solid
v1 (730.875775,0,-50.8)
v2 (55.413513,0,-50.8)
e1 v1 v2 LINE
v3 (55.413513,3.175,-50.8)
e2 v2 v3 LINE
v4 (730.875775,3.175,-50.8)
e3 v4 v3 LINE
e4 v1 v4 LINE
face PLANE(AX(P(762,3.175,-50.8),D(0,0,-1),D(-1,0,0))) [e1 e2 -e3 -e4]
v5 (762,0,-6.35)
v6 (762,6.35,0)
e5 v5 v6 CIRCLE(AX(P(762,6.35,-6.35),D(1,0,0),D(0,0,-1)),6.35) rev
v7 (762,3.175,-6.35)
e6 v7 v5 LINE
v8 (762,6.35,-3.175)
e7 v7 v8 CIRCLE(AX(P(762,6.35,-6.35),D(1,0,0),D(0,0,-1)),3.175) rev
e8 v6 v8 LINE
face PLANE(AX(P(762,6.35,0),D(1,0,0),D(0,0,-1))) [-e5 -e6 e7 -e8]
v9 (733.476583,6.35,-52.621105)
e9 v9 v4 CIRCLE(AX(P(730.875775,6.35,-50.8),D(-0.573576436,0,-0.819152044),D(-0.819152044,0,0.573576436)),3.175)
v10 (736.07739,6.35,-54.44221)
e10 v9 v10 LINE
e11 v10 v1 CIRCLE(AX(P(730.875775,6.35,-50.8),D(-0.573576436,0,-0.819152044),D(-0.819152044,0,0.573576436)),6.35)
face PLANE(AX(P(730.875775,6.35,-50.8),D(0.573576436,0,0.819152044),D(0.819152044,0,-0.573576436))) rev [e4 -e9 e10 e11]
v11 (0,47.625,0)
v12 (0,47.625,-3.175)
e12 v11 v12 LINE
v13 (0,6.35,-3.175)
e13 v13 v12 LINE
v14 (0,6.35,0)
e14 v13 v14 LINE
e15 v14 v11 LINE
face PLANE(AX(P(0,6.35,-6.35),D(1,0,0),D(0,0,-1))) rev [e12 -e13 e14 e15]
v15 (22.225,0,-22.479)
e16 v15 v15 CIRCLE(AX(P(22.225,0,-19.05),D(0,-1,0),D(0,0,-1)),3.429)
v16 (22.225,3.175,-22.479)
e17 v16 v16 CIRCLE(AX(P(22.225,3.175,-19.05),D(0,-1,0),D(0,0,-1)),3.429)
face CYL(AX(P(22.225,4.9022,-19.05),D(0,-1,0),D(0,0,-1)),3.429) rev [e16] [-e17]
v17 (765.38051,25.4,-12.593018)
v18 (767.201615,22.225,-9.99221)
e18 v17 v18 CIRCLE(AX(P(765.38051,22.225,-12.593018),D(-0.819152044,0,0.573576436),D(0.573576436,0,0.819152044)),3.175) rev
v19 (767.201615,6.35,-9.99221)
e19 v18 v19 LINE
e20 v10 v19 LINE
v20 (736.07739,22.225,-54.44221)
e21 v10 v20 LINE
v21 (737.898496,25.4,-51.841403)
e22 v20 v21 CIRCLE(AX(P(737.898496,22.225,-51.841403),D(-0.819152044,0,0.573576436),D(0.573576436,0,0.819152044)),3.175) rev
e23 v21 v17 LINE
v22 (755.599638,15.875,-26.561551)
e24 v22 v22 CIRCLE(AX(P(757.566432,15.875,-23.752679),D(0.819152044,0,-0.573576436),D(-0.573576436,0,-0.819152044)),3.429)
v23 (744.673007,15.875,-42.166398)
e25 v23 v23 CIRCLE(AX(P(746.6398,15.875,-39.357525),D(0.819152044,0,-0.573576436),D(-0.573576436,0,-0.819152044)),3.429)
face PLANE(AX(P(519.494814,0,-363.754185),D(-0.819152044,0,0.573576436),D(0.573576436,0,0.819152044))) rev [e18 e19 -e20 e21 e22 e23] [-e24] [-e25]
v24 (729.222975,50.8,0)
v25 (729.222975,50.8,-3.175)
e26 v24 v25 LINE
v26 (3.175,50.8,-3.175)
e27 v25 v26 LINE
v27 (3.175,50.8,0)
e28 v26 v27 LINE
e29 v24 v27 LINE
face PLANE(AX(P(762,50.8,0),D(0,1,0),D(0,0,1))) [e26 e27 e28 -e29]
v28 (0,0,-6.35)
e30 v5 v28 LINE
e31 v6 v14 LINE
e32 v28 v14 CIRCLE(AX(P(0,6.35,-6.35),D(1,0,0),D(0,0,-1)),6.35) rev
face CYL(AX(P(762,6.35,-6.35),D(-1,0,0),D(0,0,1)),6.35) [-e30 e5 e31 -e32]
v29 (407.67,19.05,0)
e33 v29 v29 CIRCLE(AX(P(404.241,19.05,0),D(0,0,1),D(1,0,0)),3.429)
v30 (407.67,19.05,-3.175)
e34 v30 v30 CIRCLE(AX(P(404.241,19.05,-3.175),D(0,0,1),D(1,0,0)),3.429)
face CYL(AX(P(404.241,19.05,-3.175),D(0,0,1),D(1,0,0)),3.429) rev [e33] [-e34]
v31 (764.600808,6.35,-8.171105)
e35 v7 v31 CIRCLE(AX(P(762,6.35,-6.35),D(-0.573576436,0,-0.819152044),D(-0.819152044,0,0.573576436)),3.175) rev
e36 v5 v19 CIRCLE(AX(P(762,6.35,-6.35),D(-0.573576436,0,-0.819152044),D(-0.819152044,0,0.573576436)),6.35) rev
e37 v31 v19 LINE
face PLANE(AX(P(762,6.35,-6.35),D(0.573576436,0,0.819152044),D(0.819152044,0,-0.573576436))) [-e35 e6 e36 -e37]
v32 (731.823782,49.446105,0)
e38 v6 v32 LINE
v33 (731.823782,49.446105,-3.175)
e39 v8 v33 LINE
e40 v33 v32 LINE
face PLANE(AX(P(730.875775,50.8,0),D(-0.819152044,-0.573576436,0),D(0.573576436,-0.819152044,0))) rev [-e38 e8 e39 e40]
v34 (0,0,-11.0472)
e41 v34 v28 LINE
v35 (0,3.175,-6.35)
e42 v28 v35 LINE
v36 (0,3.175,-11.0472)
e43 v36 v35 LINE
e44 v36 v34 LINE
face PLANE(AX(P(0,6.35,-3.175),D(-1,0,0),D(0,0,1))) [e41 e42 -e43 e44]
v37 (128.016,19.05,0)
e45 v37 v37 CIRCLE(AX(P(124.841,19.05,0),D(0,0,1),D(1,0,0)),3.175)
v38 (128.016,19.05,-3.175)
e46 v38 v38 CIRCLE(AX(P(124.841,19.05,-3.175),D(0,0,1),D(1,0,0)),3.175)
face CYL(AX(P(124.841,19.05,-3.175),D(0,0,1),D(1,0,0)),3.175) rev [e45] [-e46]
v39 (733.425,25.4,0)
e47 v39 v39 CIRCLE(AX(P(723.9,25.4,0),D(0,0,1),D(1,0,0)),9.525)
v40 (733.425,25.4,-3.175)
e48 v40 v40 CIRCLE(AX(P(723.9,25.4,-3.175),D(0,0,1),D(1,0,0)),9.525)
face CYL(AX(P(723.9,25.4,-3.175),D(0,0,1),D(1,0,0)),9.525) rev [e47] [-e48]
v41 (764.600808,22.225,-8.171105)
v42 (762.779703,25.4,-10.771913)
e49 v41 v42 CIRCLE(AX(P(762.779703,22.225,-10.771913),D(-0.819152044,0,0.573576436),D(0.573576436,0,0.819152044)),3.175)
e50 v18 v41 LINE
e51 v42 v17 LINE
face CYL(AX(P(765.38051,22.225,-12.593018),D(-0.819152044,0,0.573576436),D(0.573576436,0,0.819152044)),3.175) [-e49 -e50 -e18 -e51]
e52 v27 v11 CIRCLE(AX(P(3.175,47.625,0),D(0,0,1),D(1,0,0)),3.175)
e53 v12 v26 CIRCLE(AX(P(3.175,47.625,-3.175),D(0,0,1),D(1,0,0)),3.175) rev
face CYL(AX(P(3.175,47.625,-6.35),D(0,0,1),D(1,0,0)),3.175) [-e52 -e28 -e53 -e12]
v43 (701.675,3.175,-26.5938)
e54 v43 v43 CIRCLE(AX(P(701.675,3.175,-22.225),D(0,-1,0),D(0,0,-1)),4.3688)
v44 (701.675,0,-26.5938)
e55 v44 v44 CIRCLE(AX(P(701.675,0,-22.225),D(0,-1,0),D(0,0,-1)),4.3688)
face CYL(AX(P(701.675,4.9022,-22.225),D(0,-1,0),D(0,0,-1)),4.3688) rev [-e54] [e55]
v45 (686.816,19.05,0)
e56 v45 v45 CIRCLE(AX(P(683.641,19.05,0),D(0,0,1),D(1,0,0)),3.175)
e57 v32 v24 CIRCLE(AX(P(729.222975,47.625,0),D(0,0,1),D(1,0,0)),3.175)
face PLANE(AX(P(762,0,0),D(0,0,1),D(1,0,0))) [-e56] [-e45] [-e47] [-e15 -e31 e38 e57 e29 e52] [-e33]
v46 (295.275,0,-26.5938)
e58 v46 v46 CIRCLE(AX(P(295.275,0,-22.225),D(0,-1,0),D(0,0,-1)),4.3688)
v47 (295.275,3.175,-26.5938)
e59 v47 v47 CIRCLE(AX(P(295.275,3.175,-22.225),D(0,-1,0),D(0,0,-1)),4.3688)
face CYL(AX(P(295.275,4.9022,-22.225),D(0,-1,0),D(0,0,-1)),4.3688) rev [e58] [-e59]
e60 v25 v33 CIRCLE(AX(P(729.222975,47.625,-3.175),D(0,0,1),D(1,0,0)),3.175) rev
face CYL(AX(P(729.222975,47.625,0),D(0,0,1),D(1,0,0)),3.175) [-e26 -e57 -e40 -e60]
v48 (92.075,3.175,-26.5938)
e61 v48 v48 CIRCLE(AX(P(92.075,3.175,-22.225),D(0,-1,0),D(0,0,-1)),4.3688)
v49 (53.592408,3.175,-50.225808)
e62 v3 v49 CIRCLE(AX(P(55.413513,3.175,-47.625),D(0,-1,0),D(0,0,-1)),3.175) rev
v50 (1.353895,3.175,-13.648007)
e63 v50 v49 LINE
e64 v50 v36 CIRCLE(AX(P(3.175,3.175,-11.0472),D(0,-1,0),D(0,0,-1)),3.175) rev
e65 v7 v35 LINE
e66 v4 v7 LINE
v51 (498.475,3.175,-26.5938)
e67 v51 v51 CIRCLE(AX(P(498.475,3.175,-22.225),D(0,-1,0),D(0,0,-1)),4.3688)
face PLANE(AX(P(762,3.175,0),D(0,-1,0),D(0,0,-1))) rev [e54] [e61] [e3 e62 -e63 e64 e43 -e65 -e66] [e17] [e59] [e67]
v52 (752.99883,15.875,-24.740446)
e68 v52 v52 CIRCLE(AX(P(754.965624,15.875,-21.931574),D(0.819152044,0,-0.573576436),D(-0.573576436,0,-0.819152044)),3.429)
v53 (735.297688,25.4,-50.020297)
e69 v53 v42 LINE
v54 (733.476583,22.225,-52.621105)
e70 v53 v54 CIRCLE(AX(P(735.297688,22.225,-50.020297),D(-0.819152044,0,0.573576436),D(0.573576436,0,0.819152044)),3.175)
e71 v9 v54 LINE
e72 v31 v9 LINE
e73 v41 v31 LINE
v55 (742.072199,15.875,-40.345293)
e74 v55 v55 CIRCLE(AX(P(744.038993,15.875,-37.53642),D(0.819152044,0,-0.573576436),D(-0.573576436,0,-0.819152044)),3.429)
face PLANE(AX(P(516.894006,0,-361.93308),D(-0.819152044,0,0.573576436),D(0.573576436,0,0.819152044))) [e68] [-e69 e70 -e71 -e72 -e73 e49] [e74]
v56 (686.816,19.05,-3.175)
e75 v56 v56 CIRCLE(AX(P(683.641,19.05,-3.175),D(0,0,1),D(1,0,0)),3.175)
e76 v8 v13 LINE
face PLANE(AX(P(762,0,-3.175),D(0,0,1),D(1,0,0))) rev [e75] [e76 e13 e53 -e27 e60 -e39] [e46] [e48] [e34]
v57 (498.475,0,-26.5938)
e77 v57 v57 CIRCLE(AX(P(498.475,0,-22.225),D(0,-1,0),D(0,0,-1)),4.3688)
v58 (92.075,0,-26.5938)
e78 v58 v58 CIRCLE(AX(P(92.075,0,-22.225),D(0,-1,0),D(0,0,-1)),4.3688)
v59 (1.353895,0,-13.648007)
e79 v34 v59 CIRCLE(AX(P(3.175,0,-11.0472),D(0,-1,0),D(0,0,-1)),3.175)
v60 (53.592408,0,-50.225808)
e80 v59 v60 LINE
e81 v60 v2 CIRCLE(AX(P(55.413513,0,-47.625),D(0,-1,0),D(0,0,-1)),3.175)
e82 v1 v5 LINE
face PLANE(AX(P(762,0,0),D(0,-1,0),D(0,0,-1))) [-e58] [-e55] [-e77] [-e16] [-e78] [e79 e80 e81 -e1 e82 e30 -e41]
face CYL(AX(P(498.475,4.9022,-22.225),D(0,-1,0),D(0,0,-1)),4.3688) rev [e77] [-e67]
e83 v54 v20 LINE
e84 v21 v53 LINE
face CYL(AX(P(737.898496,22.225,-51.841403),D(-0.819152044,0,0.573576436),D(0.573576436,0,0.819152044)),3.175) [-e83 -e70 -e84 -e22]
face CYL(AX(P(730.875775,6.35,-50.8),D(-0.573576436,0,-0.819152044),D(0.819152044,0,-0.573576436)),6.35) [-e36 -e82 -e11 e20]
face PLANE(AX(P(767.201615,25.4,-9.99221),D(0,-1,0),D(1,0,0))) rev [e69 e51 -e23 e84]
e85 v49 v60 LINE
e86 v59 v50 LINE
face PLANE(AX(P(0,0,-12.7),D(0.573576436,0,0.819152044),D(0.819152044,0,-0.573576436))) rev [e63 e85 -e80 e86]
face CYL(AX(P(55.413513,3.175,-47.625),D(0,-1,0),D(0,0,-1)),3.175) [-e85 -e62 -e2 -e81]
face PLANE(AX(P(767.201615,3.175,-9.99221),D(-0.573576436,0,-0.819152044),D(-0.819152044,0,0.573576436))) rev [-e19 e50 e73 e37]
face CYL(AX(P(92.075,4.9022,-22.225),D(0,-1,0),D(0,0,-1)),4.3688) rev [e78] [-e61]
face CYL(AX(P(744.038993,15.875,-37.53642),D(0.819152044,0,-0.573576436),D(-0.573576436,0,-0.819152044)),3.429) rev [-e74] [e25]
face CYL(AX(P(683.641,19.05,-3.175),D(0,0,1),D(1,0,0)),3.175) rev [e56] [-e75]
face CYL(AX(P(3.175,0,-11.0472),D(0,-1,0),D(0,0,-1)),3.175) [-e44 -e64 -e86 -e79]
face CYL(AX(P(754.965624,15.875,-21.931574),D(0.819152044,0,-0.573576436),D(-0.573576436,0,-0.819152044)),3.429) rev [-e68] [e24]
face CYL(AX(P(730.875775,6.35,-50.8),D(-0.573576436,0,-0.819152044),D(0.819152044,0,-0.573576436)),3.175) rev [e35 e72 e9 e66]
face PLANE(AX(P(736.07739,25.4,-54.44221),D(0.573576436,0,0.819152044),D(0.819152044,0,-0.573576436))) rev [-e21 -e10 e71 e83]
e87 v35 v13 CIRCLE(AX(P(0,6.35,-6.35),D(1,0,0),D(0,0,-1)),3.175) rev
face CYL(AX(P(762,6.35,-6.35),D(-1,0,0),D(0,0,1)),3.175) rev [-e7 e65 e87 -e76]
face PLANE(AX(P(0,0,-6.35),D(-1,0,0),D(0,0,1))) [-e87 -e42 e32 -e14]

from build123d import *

# Parameters (mm, degrees)
BASE_FLANGE1_DEPTH = 762
CUT_EXTRUDE1_DEPTH = 3.175
CUT_EXTRUDE2_DEPTH = 3.175
EDGE_FLANGE1_DEPTH = 54.26343047
SKETCH9_R          = 3.175
SKETCH9_R_2        = 9.525
SKETCH9_R_3        = 3.429
CUT_EXTRUDE3_DEPTH = 3.175
SKETCH10_R         = 4.3688
SKETCH10_R_2       = 3.429
CUT_EXTRUDE4_DEPTH = 4.9022
SKETCH11_R         = 3.429
CUT_EXTRUDE5_DEPTH = 3.175
FILLET1_R          = 3.175


# Sheet-metal steps are written as plain solids
with BuildPart() as part:
    # Sketch1 → Base-Flange1 (new body)
    with BuildSketch(Plane(origin=(0, 0, 0), x_dir=(0, 0, -1), z_dir=(1, 0, 0))):
        with BuildLine():
            Line((0, 50.8), (0, 6.35))
            ThreePointArc((0, 6.35), (1.859871939, 1.859871939), (6.35, 0))
            Line((6.35, 0), (50.8, 0))
            Line((50.8, 0), (50.8, 3.175))
            Line((50.8, 3.175), (6.35, 3.175))
            ThreePointArc((6.35, 3.175), (4.10493597, 4.10493597), (3.175, 6.35))
            Line((3.175, 6.35), (3.175, 50.8))
            Line((3.175, 50.8), (0, 50.8))
        make_face()
    extrude(amount=BASE_FLANGE1_DEPTH)

    # Sketch3 → Cut-Extrude1 (cut)
    with BuildSketch(Plane(origin=(0, 0, -3.175), x_dir=(-1, 0, 0), z_dir=(0, 0, -1))):
        Polygon((-762, 6.35), (-762, 50.8), (-730.875774927, 50.8), align=None)
    extrude(amount=-CUT_EXTRUDE1_DEPTH, mode=Mode.SUBTRACT)

    # Sketch4 → Cut-Extrude2 (cut)
    with BuildSketch(Plane(origin=(0, 3.175, 0), x_dir=(1, 0, 0), z_dir=(0, 1, 0))):
        Polygon((762, 6.35), (730.875774927, 50.8), (762, 50.8), align=None)
        Polygon((0, 12.7), (54.412439057, 50.8), (0, 50.8), align=None)
    extrude(amount=-CUT_EXTRUDE2_DEPTH, mode=Mode.SUBTRACT)

    # Edge-Flange1 section (across the edge) → Edge-Flange1 (add)
    with BuildSketch(Plane(origin=(764.600807741, 3.175, -8.171105185), x_dir=(-0.8191520442889946, 3.4914813388431337e-15, 0.5735764363510422), z_dir=(-0.5735764363510422, 0, -0.8191520442889946))):
        with BuildLine():
            Line((-3.175, 3.175), (-3.175, 22.225))
            Line((-3.175, 22.225), (0, 22.225))
            Line((0, 22.225), (0, 3.175))
            ThreePointArc((0, 3.175), (0.92993597, 0.92993597), (3.175, 0))
            Line((3.175, 0), (3.175, -3.175))
            ThreePointArc((3.175, -3.175), (-1.315128061, -1.315128061), (-3.175, 3.175))
        make_face()
    extrude(amount=EDGE_FLANGE1_DEPTH)

    # Sketch9 → Cut-Extrude3 (cut)
    with BuildSketch(Plane.XY):
        with Locations((124.841, 19.05)):
            Circle(SKETCH9_R)
        with Locations((683.641, 19.05)):
            Circle(SKETCH9_R)
        with Locations((723.9, 25.4)):
            Circle(SKETCH9_R_2)
        with Locations((404.241, 19.05)):
            Circle(SKETCH9_R_3)
    extrude(amount=-CUT_EXTRUDE3_DEPTH, mode=Mode.SUBTRACT)

    # Sketch10 → Cut-Extrude4 (cut)
    with BuildSketch(Plane.XZ):
        with Locations(Location((92.075, -22.225, 0), (0, 0, 270))):
            Circle(SKETCH10_R)
        with Locations(Location((295.275, -22.225, 0), (0, 0, 270))):
            Circle(SKETCH10_R)
        with Locations(Location((498.475, -22.225, 0), (0, 0, 270))):
            Circle(SKETCH10_R)
        with Locations(Location((701.675, -22.225, 0), (0, 0, 270))):
            Circle(SKETCH10_R)
        with Locations(Location((22.225, -19.05, 0), (0, 0, 270))):
            Circle(SKETCH10_R_2)
    extrude(amount=-CUT_EXTRUDE4_DEPTH, mode=Mode.SUBTRACT)

    # Sketch11 → Cut-Extrude5 (cut)
    with BuildSketch(Plane(origin=(519.494814159, 0, -363.754184935), x_dir=(-0.5735764363510422, 1.0031284501279259e-15, -0.8191520442889946), z_dir=(0.8191520442889947, -1.4326158965565184e-15, -0.5735764363510422))):
        with Locations((-396.015198548, 15.875)):
            Circle(SKETCH11_R)
        with Locations((-415.065198548, 15.875)):
            Circle(SKETCH11_R)
    extrude(amount=-CUT_EXTRUDE5_DEPTH, mode=Mode.SUBTRACT)

    # Fillet1
    fillet1_edges = [part.edges().sort_by_distance(p)[0] for p in [
        (730.875774927, 50.8, -1.5875),
        (0, 1.5875, -12.7),
        (54.412439057, 1.5875, -50.8),
        (765.901211611, 25.4, -9.081657778),
        (734.776986538, 25.4, -53.531657778),
        (0, 50.8, -1.5875),
    ]]
    fillet(fillet1_edges, radius=FILLET1_R)


solid = part.part
